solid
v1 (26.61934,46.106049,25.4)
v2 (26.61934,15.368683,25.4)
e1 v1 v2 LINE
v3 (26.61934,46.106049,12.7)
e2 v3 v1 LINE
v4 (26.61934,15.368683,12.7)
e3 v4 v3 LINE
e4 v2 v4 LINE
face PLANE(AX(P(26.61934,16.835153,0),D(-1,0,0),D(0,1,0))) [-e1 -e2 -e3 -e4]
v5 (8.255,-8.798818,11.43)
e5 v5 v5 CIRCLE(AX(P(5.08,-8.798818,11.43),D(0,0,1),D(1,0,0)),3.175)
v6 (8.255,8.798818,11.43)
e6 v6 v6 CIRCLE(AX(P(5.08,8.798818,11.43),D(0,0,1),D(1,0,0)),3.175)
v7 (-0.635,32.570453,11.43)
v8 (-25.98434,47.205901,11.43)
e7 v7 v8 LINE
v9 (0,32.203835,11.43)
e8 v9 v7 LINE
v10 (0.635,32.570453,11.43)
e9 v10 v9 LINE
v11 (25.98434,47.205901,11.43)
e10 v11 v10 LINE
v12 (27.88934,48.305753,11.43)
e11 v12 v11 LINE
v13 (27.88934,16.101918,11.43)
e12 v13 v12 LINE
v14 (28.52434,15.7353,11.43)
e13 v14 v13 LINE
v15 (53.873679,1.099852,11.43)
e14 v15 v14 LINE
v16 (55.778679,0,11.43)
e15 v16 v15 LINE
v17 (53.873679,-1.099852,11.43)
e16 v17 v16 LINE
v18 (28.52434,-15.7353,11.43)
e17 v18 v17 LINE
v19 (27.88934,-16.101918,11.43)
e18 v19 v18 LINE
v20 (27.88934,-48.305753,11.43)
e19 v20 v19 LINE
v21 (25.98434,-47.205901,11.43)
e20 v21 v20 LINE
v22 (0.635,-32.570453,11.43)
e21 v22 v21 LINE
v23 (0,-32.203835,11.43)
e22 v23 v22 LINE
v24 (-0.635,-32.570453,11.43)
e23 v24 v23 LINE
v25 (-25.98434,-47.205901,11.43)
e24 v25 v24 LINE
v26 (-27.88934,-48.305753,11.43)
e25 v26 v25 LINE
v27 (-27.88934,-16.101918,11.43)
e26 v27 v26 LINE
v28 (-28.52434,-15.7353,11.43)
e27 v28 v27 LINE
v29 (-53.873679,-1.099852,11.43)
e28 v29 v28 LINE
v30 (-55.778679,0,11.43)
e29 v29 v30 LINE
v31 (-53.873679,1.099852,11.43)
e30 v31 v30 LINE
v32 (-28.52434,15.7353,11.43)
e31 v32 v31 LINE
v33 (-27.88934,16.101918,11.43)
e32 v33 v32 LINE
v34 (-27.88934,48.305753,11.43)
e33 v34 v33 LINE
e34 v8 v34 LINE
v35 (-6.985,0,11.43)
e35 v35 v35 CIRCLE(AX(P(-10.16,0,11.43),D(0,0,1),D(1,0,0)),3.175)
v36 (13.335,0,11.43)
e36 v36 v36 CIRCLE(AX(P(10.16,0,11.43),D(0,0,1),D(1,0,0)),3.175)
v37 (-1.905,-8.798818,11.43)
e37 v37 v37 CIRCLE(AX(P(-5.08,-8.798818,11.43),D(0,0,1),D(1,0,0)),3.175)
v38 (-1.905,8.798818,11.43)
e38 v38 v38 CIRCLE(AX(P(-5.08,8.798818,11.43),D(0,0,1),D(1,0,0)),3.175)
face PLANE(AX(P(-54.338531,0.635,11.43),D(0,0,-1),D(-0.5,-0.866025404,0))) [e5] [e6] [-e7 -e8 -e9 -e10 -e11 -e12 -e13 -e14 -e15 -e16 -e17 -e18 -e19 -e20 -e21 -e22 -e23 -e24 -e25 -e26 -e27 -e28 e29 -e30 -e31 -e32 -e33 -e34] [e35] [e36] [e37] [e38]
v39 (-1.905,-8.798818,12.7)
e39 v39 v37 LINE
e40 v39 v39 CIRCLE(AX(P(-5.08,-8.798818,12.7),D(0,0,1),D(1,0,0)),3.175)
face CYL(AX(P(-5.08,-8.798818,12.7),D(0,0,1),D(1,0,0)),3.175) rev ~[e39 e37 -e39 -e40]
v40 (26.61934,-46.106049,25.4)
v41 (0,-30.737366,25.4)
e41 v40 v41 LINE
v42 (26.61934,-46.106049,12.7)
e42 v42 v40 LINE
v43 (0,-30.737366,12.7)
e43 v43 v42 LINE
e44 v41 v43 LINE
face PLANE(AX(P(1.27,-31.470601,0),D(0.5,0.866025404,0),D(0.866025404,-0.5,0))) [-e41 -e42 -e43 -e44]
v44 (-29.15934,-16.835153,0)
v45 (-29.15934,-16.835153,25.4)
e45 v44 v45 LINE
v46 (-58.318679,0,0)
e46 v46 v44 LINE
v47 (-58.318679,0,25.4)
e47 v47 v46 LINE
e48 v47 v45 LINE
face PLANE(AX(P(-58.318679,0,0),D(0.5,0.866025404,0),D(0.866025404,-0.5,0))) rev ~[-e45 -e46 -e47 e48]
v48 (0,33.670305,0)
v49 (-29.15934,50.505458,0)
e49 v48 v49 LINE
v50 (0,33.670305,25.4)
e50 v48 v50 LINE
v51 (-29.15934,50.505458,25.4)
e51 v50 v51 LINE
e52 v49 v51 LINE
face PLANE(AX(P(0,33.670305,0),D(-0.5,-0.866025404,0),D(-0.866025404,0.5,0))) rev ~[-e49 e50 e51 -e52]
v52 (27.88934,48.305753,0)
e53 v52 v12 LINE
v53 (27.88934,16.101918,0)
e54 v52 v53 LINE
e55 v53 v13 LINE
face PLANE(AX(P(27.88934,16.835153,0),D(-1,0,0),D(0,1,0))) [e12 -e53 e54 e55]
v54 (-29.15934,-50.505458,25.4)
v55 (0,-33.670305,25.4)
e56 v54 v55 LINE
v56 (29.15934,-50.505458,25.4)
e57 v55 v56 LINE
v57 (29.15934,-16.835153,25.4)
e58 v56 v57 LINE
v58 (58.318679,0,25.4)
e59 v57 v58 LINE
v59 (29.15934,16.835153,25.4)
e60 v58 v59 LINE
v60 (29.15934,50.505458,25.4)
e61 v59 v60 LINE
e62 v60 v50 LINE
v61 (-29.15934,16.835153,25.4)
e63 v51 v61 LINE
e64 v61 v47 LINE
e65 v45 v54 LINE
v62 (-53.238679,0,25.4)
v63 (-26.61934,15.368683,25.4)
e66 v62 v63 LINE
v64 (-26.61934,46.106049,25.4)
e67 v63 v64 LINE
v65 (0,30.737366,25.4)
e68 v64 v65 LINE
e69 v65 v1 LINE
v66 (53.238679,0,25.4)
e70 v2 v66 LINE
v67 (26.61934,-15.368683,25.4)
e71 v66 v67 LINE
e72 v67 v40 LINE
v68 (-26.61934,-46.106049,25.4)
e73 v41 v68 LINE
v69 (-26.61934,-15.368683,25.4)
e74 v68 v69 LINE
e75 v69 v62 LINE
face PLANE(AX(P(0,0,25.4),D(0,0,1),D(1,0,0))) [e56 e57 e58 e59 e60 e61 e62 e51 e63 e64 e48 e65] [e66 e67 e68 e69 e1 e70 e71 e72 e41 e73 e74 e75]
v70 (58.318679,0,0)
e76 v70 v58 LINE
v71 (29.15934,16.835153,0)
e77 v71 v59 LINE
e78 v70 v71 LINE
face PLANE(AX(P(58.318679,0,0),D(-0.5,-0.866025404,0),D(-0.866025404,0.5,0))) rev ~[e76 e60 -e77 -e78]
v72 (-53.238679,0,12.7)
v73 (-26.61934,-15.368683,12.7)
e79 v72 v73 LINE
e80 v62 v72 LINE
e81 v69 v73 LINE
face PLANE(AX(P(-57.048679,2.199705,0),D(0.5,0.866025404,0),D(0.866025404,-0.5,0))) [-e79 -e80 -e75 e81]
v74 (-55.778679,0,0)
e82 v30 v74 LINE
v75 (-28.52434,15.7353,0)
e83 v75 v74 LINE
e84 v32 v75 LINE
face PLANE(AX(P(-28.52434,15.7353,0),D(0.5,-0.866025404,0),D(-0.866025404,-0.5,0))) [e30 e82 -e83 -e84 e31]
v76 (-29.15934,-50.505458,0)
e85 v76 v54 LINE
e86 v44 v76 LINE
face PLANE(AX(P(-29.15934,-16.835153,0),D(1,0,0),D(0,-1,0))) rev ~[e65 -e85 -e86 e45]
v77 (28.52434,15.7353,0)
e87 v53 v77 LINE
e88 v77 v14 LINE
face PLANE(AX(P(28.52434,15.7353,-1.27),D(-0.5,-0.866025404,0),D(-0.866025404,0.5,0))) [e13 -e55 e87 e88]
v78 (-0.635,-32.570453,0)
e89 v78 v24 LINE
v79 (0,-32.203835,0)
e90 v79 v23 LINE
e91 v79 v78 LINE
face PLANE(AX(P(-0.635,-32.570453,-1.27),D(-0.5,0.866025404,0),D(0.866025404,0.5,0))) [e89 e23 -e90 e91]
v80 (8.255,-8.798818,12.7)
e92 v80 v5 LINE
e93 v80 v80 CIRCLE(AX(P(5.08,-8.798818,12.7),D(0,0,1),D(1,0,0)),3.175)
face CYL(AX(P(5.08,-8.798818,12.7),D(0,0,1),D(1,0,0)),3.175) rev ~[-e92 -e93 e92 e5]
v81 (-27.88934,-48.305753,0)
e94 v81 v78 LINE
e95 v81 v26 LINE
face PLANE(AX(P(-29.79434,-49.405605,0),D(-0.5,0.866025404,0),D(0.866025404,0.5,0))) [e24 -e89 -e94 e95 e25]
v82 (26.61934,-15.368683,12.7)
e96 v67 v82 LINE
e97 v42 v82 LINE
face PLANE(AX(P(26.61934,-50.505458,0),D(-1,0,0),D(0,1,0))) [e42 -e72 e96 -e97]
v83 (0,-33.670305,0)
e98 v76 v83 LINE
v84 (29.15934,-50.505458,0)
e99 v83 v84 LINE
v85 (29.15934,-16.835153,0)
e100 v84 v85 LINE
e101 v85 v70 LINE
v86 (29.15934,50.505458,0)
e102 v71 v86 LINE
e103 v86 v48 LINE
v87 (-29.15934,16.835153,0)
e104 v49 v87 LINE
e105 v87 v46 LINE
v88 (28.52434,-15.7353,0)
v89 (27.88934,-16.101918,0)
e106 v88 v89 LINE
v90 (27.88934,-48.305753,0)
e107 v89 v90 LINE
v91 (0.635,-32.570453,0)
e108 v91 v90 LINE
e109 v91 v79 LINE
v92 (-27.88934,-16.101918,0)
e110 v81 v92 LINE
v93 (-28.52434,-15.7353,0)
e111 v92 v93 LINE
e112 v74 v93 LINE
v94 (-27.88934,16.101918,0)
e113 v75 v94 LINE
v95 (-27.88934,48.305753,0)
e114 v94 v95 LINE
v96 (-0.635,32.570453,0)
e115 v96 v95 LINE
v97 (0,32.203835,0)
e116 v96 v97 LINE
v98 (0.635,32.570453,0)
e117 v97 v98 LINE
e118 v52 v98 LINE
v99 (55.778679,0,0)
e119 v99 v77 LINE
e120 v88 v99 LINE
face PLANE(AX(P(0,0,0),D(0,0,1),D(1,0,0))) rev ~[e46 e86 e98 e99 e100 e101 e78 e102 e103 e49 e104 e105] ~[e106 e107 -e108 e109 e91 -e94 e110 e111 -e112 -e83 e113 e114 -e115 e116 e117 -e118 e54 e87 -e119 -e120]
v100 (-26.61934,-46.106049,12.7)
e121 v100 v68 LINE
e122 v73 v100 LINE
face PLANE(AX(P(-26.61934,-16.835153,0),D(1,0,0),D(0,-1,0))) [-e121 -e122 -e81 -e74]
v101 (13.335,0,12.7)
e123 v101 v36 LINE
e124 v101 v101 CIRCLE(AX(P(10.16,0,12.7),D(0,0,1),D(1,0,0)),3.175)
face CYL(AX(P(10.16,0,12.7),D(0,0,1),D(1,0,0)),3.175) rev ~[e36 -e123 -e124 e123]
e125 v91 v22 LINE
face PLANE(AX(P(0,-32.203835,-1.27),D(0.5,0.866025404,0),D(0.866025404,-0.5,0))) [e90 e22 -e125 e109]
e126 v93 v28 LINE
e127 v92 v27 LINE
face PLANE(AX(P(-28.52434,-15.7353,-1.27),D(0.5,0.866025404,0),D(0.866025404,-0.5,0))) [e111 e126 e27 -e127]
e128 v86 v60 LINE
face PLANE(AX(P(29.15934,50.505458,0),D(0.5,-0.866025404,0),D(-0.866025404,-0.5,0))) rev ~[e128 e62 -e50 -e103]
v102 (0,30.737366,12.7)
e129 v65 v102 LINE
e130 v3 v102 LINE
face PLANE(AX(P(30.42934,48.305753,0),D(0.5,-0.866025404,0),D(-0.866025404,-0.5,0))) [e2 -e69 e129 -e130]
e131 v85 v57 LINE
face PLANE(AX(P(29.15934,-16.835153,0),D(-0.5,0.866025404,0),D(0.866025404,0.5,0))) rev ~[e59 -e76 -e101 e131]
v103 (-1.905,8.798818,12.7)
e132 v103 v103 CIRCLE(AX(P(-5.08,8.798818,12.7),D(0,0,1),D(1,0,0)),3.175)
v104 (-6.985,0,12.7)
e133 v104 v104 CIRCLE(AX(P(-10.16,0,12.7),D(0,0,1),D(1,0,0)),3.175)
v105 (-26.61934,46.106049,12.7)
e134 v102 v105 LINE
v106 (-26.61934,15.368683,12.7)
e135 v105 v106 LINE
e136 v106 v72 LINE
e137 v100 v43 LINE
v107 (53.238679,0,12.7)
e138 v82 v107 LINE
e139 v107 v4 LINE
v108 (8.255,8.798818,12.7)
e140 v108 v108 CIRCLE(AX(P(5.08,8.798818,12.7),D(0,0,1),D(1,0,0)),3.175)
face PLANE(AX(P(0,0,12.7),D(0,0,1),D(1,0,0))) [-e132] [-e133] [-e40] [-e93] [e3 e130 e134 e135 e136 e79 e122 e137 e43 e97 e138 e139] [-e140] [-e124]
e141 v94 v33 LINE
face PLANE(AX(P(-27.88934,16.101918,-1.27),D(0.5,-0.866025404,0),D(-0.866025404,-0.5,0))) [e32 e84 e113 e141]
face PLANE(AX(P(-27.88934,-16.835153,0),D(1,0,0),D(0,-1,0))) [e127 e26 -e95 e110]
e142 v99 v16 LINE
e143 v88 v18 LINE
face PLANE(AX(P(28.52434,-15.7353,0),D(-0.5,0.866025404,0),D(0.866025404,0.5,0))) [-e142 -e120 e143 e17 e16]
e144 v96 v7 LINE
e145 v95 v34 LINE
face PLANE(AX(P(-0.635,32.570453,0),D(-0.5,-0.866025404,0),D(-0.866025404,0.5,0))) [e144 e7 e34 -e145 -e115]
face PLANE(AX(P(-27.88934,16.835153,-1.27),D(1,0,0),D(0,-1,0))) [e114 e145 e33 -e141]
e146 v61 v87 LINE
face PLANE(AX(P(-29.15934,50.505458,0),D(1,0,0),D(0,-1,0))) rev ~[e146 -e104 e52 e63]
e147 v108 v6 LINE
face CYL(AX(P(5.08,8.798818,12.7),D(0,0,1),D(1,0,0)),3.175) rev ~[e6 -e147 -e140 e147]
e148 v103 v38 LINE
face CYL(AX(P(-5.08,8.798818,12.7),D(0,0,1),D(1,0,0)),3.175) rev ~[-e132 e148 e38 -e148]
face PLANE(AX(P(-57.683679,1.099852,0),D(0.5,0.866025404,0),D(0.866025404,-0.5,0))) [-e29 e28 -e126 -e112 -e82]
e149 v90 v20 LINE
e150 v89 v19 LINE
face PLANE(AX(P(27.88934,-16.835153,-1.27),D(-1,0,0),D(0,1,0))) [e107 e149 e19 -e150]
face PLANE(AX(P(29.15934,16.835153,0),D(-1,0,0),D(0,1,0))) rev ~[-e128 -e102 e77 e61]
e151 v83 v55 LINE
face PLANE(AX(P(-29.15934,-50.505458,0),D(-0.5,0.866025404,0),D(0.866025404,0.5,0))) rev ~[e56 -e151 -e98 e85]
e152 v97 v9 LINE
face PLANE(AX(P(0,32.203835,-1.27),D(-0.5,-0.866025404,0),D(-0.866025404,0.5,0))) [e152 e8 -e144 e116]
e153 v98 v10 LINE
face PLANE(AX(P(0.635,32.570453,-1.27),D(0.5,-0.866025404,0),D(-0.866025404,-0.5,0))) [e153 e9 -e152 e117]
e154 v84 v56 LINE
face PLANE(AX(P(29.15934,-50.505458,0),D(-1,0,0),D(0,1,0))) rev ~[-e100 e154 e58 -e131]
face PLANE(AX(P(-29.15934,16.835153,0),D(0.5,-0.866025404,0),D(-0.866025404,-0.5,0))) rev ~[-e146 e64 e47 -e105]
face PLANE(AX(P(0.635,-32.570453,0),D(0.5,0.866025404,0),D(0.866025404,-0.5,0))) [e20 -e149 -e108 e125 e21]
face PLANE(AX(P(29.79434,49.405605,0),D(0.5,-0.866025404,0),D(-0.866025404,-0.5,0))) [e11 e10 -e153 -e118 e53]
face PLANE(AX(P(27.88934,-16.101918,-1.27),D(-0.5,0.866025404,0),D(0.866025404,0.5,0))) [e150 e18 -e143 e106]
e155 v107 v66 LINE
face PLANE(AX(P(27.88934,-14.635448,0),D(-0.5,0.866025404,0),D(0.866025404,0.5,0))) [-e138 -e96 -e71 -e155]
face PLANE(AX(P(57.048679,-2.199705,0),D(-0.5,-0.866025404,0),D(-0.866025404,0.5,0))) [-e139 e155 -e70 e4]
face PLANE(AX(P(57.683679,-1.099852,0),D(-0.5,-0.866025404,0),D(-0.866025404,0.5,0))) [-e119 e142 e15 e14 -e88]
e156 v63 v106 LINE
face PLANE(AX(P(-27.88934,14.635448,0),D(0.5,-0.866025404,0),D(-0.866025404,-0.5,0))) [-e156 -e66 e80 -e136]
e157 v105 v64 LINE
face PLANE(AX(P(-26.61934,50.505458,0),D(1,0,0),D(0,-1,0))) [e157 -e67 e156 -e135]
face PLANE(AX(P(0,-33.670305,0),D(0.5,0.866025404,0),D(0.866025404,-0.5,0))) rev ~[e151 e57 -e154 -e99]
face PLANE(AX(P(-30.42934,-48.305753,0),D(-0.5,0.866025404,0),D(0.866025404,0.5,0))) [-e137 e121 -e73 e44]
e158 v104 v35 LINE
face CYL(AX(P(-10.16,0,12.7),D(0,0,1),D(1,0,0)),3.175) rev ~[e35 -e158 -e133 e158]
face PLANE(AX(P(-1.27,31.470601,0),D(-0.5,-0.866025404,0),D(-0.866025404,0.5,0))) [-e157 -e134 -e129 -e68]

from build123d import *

# Parameters (mm, degrees)
F1_DEPTH     = 25.4
F2_T         = -2.54
F3_DEPTH     = 12.7
F4_T         = 1.27
F4_T3_DEPTH  = 27.94
F4_T5_DEPTH  = 33.2773657547
F4_T7_DEPTH  = 15.24
F4_T9_DEPTH  = 33.2773657547
F4_T11_DEPTH = 33.2773657547
F4_T13_DEPTH = 33.2773657547
F4_T15_DEPTH = 33.2773657547
F4_T17_DEPTH = 33.2773657547
F4_T19_DEPTH = 33.2773657547
F4_T21_DEPTH = 33.2773657547
F4_T23_DEPTH = 33.2773657547
F4_T25_DEPTH = 33.2773657547
F5_R         = 3.175
F6_DEPTH     = 25.4


# Not quite as in the source:
# - a shell that OpenCascade refuses in one call is made with other operations: the cavity is built on its own and cut out


with BuildPart() as f1:
    # F0 (on Top) → F1 (new body)
    with BuildSketch(Plane.XY):
        Polygon((-58.3186791779, 0), (-29.159339589, -16.8351525611), (-29.159339589, -50.5054576833), (0, -33.6703051222), (29.159339589, -50.5054576833), (29.159339589, -16.8351525611), (58.3186791779, 0), (29.159339589, 16.8351525611), (29.159339589, 50.5054576833), (0, 33.6703051222), (-29.159339589, 50.5054576833), (-29.159339589, 16.8351525611), align=None)
    extrude(amount=F1_DEPTH)

    # F2
    f2_openings = [f1.faces().sort_by_distance(p)[0] for p in [
        (0, 0, 25.4),
    ]]
    offset(amount=F2_T, openings=f2_openings, kind=Kind.INTERSECTION)

    # F0 (on Top) → F3 (join)
    with BuildSketch(Plane.XY):
        Polygon((-58.3186791779, 0), (-29.159339589, -16.8351525611), (-29.159339589, -50.5054576833), (0, -33.6703051222), (29.159339589, -50.5054576833), (29.159339589, -16.8351525611), (58.3186791779, 0), (29.159339589, 16.8351525611), (29.159339589, 50.5054576833), (0, 33.6703051222), (-29.159339589, 50.5054576833), (-29.159339589, 16.8351525611), align=None)
    extrude(amount=F3_DEPTH)

    # F4: shell of thickness 1.27, made by hand


with BuildPart() as f4_core1:
    # F4_t2: copy of F1
    add(f1.part)

    # the walls: a layer under each face that stays
    f4_faces = [f4_core1.faces().sort_by_distance(p)[0] for p in [
        (-43.7390093835, -8.4175762805, 12.7),
        (-29.159339589, -33.6703051222, 12.7),
        (-14.5796697945, -42.0878814027, 12.7),
        (14.5796697945, -42.0878814027, 12.7),
        (29.159339589, -33.6703051222, 12.7),
        (43.7390093835, -8.4175762805, 12.7),
        (43.7390093835, 8.4175762805, 12.7),
        (29.159339589, 33.6703051222, 12.7),
        (14.5796697945, 42.0878814027, 12.7),
        (-14.5796697945, 42.0878814027, 12.7),
        (-29.159339589, 33.6703051222, 12.7),
        (-54.4307672328, 0, 25.4),
        (-26.619339589, -30.7373657547, 19.05),
        (0, 0, 12.7),
        (-13.3096697945, -38.4217071934, 19.05),
        (13.3096697945, -38.4217071934, 19.05),
        (26.619339589, -30.7373657547, 19.05),
        (39.9290093835, -7.6843414387, 19.05),
        (39.9290093835, 7.6843414387, 19.05),
        (26.619339589, 30.7373657547, 19.05),
        (13.3096697945, 38.4217071934, 19.05),
        (-13.3096697945, 38.4217071934, 19.05),
        (-26.619339589, 30.7373657547, 19.05),
        (-39.9290093835, 7.6843414387, 19.05),
        (-39.9290093835, -7.6843414387, 19.05),
        (-43.7390093835, 8.4175762805, 12.7),
    ]]
    thicken(f4_faces, amount=-F4_T, mode=Mode.SUBTRACT)

    # F4_s4 → F4_t3 (cut)
    with BuildSketch(Plane.XY.offset(-1.27)):
        Polygon((-29.178389589, -16.8461510837), (-28.524339589, -15.7353002983), (-27.889339589, -16.1019177192), (-27.889339589, -16.8351525611), align=None)
        Polygon((0, -33.6923021674), (-0.635, -32.5704528594), (0, -32.2038354384), (0.635, -32.5704528594), align=None)
        Polygon((29.178389589, -16.8461510837), (27.889339589, -16.8351525611), (27.889339589, -16.1019177192), (28.524339589, -15.7353002983), align=None)
        Polygon((29.178389589, 16.8461510837), (28.524339589, 15.7353002983), (27.889339589, 16.1019177192), (27.889339589, 16.8351525611), align=None)
        Polygon((0, 33.6923021674), (0.635, 32.5704528594), (0, 32.2038354384), (-0.635, 32.5704528594), align=None)
        Polygon((-29.178389589, 16.8461510837), (-27.889339589, 16.8351525611), (-27.889339589, 16.1019177192), (-28.524339589, 15.7353002983), align=None)
    extrude(amount=F4_T3_DEPTH, mode=Mode.SUBTRACT)

    # F4_s6 → F4_t5 (cut)
    with BuildSketch(Plane.XZ.offset(14.0986828773)):
        Polygon((-26.606639589, 12.7127), (-27.889339589, 12.7), (-27.889339589, 11.43), (-26.619339589, 11.43), align=None)
        Polygon((26.606639589, 12.7127), (26.619339589, 11.43), (27.889339589, 11.43), (27.889339589, 12.7), align=None)
    extrude(amount=F4_T5_DEPTH, mode=Mode.SUBTRACT)

    # F4_s8 → F4_t7 (cut)
    with BuildSketch(Plane.XY.offset(11.43)):
        Polygon((-26.612989589, -46.0950501094), (-27.889339589, -46.106048632), (-27.889339589, -48.3057531576), (-25.984339589, -47.2059008948), align=None)
        Polygon((26.612989589, -46.0950501094), (25.984339589, -47.2059008948), (27.889339589, -48.3057531576), (27.889339589, -46.106048632), align=None)
        Polygon((53.2259791779, 0), (53.8736791779, -1.0998522628), (55.7786791779, 0), (53.8736791779, 1.0998522628), align=None)
        Polygon((26.612989589, 46.0950501094), (27.889339589, 46.106048632), (27.889339589, 48.3057531576), (25.984339589, 47.2059008948), align=None)
        Polygon((-26.612989589, 46.0950501094), (-25.984339589, 47.2059008948), (-27.889339589, 48.3057531576), (-27.889339589, 46.106048632), align=None)
        Polygon((-53.2259791779, 0), (-53.8736791779, 1.0998522628), (-55.7786791779, 0), (-53.8736791779, -1.0998522628), align=None)
    extrude(amount=F4_T7_DEPTH, mode=Mode.SUBTRACT)

    # F4_s10 → F4_t9 (cut)
    with BuildSketch(Plane(origin=(-12.2098175317, -7.0493414387, 0), x_dir=(0, 0, 1), z_dir=(-0.8660254038, -0.5, 0))):
        Polygon((12.7127, 26.606639589), (11.43, 26.619339589), (11.43, 27.889339589), (12.7, 27.889339589), align=None)
    extrude(amount=F4_T9_DEPTH, mode=Mode.SUBTRACT)

    # F4_s12 → F4_t11 (cut)
    with BuildSketch(Plane.XZ.offset(-47.376048632)):
        Polygon((-26.606639589, 12.7127), (-26.619339589, 11.43), (-27.889339589, 11.43), (-27.889339589, 12.7), align=None)
        Polygon((26.606639589, 12.7127), (26.619339589, 11.43), (27.889339589, 11.43), (27.889339589, 12.7), align=None)
    extrude(amount=F4_T11_DEPTH, mode=Mode.SUBTRACT)

    # F4_s14 → F4_t13 (cut)
    with BuildSketch(Plane(origin=(-12.2098175317, 7.0493414387, 0), x_dir=(0, 0, 1), z_dir=(-0.8660254038, 0.5, 0))):
        Polygon((12.7127, 26.606639589), (11.43, 26.619339589), (11.43, 27.889339589), (12.7, 27.889339589), align=None)
    extrude(amount=F4_T13_DEPTH, mode=Mode.SUBTRACT)

    # F4_s16 → F4_t15 (cut)
    with BuildSketch(Plane(origin=(41.0288616463, 23.688024316, 0), x_dir=(0, 0, 1), z_dir=(-0.8660254038, -0.5, 0))):
        Polygon((12.7127, 26.606639589), (11.43, 26.619339589), (11.43, 27.889339589), (12.7, 27.889339589), align=None)
    extrude(amount=F4_T15_DEPTH, mode=Mode.SUBTRACT)

    # F4_s18 → F4_t17 (cut)
    with BuildSketch(Plane(origin=(41.0288616463, -23.688024316, 0), x_dir=(0, 0, 1), z_dir=(-0.8660254038, 0.5, 0))):
        Polygon((12.7127, 26.606639589), (11.43, 26.619339589), (11.43, 27.889339589), (12.7, 27.889339589), align=None)
    extrude(amount=F4_T17_DEPTH, mode=Mode.SUBTRACT)

    # F4_s20 → F4_t19 (cut)
    with BuildSketch(Plane(origin=(12.2098175317, 7.0493414387, 0), x_dir=(0, 0, 1), z_dir=(0.8660254038, 0.5, 0))):
        Polygon((12.7127, 26.606639589), (11.43, 26.619339589), (11.43, 27.889339589), (12.7, 27.889339589), align=None)
    extrude(amount=F4_T19_DEPTH, mode=Mode.SUBTRACT)

    # F4_s22 → F4_t21 (cut)
    with BuildSketch(Plane(origin=(12.2098175317, -7.0493414387, 0), x_dir=(0, 0, 1), z_dir=(0.8660254038, -0.5, 0))):
        Polygon((12.7127, 26.606639589), (11.43, 26.619339589), (11.43, 27.889339589), (12.7, 27.889339589), align=None)
    extrude(amount=F4_T21_DEPTH, mode=Mode.SUBTRACT)

    # F4_s24 → F4_t23 (cut)
    with BuildSketch(Plane(origin=(-41.0288616463, -23.688024316, 0), x_dir=(0, 0, 1), z_dir=(0.8660254038, 0.5, 0))):
        Polygon((12.7127, 26.606639589), (11.43, 26.619339589), (11.43, 27.889339589), (12.7, 27.889339589), align=None)
    extrude(amount=F4_T23_DEPTH, mode=Mode.SUBTRACT)

    # F4_s26 → F4_t25 (cut)
    with BuildSketch(Plane(origin=(-41.0288616463, 23.688024316, 0), x_dir=(0, 0, 1), z_dir=(0.8660254038, -0.5, 0))):
        Polygon((12.7127, 26.606639589), (11.43, 26.619339589), (11.43, 27.889339589), (12.7, 27.889339589), align=None)
    extrude(amount=F4_T25_DEPTH, mode=Mode.SUBTRACT)


with BuildPart() as f1_1:
    add(f1.part)

    # what is left inside the walls is the cavity
    f4_cavity = [f4_core1.part.solids().sort_by_distance(p)[0] for p in [
        (13.94467, -8.050959, 11.4173),
    ]]
    add(f4_cavity, mode=Mode.SUBTRACT)

    # F5 (on face) → F6 (cut)
    with BuildSketch(Plane.XY.offset(12.7)):
        with Locations((5.08, 8.7988181024)):
            Circle(F5_R)
        with Locations((10.16, 0)):
            Circle(F5_R)
        with Locations((5.08, -8.7988181024)):
            Circle(F5_R)
        with Locations((-5.08, -8.7988181024)):
            Circle(F5_R)
        with Locations((-10.16, 0)):
            Circle(F5_R)
        with Locations((-5.08, 8.7988181024)):
            Circle(F5_R)
    extrude(amount=-F6_DEPTH, mode=Mode.SUBTRACT)


solid = f1_1.part
